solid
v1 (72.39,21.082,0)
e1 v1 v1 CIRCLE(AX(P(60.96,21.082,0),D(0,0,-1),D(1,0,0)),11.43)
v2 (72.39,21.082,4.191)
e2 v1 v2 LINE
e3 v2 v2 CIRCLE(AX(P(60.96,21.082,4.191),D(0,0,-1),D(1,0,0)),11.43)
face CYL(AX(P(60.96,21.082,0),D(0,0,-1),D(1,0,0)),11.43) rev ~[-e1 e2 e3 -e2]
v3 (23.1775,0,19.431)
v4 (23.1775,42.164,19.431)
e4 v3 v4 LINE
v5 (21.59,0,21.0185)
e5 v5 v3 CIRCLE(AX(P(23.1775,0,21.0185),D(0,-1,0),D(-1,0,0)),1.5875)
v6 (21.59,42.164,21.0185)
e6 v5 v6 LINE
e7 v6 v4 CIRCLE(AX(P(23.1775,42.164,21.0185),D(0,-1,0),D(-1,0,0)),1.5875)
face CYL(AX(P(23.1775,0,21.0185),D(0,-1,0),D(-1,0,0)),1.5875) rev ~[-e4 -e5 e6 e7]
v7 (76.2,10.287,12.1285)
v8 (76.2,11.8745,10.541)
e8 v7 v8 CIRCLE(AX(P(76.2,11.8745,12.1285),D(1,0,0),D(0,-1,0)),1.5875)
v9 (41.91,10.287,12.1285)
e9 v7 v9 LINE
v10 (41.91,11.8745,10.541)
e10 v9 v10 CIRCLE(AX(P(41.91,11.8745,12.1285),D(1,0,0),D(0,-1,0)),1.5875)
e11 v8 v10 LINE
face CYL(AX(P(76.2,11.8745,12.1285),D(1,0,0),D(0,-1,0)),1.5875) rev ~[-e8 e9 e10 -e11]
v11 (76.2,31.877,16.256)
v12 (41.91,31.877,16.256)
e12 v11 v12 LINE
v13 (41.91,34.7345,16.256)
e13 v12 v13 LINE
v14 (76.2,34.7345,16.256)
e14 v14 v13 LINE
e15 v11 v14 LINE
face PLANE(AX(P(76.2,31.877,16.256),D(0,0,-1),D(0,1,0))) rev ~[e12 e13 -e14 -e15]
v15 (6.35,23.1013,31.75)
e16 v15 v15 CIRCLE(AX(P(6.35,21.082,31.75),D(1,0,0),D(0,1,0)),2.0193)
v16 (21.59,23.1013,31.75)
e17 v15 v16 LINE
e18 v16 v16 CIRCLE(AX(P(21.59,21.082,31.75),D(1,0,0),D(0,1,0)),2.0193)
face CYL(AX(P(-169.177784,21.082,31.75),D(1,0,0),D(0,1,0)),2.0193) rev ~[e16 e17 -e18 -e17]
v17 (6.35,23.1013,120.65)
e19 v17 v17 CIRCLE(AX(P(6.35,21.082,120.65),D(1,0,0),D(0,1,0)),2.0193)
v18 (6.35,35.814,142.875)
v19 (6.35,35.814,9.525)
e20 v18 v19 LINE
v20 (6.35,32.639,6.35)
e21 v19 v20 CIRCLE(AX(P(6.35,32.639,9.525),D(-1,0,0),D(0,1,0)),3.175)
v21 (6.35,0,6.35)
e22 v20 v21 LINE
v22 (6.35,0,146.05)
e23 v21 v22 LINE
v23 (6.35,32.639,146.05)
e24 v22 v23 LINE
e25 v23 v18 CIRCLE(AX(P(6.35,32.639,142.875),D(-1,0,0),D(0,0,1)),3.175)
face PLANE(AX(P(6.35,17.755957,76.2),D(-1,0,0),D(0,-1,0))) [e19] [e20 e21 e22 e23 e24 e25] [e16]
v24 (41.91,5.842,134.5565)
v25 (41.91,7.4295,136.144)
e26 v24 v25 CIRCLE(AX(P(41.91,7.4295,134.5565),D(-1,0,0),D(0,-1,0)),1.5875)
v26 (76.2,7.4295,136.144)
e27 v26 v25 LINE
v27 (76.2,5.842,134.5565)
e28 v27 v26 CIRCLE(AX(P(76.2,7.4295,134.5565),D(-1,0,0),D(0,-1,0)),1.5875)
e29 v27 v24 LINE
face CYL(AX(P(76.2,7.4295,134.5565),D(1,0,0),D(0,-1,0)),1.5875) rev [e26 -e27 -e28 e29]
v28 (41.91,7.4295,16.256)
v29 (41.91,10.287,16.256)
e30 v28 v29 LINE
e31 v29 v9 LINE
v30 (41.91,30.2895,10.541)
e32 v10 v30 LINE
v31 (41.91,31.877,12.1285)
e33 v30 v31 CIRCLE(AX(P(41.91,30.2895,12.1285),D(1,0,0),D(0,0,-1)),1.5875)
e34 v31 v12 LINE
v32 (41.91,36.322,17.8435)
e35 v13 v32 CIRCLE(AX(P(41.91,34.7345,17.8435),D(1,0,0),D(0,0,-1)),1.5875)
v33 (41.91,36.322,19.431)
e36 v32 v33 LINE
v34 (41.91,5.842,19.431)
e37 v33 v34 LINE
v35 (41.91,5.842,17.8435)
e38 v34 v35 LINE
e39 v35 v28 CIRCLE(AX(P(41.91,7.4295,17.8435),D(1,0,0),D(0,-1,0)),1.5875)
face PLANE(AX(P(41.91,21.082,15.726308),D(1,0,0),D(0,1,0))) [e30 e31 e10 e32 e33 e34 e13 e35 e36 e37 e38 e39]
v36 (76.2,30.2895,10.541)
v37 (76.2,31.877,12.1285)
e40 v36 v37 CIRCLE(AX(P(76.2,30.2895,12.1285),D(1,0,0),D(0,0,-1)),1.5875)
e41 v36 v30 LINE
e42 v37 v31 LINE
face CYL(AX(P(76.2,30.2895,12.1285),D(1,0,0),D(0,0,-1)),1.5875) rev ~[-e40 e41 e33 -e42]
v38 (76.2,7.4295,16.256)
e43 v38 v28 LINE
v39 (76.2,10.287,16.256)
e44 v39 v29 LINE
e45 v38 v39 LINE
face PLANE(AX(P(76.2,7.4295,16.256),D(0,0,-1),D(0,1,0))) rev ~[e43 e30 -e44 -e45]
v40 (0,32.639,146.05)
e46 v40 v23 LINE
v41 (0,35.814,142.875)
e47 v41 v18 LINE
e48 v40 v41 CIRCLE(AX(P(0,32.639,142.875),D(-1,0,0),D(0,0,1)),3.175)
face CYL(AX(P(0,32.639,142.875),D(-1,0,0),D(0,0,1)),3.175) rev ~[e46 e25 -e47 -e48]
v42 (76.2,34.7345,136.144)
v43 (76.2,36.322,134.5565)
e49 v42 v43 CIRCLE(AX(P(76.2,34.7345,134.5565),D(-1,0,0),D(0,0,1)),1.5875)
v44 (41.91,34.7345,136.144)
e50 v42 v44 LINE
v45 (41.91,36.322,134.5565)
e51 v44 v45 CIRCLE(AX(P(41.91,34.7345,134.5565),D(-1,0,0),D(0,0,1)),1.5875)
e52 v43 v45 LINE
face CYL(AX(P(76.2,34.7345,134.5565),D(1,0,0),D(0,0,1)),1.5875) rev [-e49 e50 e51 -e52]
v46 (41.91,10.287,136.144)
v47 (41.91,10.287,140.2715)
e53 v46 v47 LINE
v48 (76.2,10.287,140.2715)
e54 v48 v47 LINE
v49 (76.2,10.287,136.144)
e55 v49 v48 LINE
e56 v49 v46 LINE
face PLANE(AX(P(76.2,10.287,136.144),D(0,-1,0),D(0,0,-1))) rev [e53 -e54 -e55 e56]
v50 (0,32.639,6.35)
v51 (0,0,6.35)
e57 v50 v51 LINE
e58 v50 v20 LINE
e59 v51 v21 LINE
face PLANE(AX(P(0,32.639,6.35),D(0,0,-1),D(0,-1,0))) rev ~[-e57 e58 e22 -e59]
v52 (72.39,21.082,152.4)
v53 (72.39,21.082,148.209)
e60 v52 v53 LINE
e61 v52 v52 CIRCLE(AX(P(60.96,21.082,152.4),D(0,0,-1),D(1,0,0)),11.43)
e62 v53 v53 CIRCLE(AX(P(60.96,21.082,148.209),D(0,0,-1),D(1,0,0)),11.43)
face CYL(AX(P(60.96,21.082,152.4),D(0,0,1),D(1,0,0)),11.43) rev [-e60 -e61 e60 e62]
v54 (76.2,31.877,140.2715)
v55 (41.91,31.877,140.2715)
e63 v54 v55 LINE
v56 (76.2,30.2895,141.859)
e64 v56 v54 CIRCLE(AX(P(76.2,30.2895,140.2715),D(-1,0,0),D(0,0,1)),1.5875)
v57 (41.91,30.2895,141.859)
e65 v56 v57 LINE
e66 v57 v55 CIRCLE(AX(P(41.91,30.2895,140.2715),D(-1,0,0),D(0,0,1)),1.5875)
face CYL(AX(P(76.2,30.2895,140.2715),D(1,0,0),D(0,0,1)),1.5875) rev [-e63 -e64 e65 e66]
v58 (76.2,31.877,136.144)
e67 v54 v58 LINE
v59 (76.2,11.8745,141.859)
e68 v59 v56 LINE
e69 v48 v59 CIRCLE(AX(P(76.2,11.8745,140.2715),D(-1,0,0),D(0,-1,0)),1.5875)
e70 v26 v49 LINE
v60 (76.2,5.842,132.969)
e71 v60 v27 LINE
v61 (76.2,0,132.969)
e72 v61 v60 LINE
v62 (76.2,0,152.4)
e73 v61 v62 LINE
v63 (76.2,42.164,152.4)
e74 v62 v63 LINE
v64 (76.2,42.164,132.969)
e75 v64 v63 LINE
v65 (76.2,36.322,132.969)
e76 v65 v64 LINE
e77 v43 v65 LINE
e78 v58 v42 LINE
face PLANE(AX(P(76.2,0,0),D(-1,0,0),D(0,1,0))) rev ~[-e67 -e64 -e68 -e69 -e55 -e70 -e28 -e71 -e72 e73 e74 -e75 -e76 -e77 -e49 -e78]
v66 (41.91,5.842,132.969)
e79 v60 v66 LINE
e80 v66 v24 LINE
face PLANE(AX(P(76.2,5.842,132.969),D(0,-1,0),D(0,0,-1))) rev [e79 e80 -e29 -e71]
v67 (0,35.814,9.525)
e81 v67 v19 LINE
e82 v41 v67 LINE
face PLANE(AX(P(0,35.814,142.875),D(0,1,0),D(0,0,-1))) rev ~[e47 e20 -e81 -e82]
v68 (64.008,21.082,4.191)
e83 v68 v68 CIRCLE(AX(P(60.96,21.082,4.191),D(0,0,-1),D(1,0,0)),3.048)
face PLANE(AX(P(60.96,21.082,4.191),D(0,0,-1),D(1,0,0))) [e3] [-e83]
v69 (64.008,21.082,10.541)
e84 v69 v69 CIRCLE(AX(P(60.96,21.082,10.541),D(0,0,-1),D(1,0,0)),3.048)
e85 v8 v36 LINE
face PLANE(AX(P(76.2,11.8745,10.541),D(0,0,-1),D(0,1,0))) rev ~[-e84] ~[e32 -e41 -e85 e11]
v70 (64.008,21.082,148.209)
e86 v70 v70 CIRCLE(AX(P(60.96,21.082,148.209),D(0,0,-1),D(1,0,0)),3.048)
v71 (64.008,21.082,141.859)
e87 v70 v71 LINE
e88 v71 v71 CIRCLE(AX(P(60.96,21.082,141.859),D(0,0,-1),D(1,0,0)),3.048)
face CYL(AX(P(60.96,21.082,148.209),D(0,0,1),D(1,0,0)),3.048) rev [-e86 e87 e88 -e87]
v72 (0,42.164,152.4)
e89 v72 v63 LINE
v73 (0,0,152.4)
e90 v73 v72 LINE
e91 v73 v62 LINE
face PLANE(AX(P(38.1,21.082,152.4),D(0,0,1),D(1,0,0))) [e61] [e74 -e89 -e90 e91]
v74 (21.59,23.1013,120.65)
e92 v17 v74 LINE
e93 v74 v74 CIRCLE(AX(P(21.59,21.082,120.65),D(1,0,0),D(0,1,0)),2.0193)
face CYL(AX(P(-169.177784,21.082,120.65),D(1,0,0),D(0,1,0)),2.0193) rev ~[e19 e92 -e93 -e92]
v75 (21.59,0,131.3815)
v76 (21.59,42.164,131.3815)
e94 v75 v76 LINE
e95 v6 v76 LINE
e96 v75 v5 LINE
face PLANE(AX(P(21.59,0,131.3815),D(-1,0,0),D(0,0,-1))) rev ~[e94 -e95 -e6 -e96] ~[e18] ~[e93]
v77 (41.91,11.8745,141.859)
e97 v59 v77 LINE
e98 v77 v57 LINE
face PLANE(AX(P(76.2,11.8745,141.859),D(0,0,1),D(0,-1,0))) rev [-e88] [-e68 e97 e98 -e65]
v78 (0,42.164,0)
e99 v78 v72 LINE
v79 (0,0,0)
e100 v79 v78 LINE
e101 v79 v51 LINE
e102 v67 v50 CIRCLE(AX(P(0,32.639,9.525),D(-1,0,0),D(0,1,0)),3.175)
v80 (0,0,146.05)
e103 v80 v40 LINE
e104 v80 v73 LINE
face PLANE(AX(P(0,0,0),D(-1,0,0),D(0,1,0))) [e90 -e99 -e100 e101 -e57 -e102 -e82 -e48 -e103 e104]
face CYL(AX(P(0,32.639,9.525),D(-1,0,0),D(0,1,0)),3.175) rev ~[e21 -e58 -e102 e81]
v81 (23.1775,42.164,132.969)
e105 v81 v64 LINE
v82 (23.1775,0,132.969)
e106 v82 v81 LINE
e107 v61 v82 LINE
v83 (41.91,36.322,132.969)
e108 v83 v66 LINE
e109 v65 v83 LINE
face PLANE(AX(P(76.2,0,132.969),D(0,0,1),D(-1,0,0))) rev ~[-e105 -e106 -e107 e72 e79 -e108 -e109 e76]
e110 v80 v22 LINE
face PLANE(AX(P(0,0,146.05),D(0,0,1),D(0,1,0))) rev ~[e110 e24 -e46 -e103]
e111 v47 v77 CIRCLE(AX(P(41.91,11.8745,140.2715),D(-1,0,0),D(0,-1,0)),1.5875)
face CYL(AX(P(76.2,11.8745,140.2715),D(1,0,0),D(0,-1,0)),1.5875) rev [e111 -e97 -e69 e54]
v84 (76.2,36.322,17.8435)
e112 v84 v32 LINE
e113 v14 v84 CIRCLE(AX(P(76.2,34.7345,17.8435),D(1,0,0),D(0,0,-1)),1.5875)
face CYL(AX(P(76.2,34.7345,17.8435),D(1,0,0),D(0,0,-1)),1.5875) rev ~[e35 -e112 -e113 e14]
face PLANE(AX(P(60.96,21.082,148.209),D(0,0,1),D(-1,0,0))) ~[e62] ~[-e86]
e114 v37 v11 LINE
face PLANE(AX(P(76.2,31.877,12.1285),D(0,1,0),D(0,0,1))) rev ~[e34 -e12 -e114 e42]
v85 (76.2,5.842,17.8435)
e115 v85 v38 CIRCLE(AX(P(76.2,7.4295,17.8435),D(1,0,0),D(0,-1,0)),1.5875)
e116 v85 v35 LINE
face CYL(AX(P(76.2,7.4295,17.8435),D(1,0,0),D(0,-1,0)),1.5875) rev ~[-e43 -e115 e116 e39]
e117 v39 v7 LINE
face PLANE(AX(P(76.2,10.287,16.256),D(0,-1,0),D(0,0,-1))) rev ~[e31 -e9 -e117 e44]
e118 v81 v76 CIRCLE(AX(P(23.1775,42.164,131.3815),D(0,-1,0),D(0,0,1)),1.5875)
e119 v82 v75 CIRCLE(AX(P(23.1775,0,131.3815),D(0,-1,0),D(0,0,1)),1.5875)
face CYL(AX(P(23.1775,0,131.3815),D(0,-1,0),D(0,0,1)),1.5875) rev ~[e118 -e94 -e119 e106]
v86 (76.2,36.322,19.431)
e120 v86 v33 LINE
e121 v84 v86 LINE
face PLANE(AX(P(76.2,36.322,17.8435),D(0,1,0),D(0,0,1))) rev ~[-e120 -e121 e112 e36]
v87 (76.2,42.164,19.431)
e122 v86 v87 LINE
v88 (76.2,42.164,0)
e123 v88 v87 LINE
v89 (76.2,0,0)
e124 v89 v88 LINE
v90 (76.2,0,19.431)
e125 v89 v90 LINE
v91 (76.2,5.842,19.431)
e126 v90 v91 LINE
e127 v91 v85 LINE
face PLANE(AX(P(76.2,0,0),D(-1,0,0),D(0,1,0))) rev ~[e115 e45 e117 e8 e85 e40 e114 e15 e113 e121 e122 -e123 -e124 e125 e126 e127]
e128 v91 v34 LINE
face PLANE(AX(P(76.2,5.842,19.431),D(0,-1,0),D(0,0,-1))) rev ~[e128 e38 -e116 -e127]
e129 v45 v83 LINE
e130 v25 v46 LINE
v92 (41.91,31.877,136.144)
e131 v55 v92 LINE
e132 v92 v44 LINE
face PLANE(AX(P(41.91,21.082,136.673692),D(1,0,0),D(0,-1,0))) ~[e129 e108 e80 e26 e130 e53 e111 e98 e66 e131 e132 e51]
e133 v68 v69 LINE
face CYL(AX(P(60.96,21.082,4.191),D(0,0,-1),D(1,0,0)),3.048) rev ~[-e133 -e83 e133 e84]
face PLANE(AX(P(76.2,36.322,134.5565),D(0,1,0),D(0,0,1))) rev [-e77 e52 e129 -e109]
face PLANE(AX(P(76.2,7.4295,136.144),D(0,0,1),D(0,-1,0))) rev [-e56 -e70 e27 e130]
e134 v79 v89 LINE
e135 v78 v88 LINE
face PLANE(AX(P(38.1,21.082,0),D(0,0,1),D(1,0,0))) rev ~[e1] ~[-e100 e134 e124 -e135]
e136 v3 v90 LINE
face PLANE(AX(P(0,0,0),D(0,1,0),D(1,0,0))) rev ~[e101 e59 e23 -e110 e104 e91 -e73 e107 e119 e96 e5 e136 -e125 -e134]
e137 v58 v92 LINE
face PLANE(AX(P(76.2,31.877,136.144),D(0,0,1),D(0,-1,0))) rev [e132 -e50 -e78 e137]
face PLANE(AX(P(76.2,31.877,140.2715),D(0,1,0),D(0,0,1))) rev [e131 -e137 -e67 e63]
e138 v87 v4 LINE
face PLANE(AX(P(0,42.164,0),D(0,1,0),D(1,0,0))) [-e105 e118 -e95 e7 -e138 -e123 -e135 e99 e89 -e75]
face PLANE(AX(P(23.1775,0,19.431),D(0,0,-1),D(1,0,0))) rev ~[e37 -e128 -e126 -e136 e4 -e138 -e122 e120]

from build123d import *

# Parameters (mm, degrees)
F0_W      = 76.2
F0_H      = 42.164
F1_DEPTH  = 152.4
F3_DEPTH  = 42.165
F5_DEPTH  = 34.29
F7_R      = 11.43
F8_DEPTH  = 4.191
F9_R      = 3.048
F10_DEPTH = 6.35
F12_DEPTH = 6.35
F14_D     = 4.0386


# Not quite as in the source:
# - a pattern or mirror of a feature is missing from the dataset's text; its kind, count and spacing are read off the source's solid


with BuildPart() as f1:
    # F0 (on Top) → F1 (new body)
    with BuildSketch(Plane.XY):
        with Locations((38.1, 21.082)):
            Rectangle(F0_W, F0_H)
    extrude(amount=F1_DEPTH)

    # F2 (on face) → F3 (cut, through all)
    with BuildSketch(Plane.XZ):
        with BuildLine():
            Line((23.1775, 19.431), (76.2, 19.431))
            Line((76.2, 19.431), (76.2, 132.969))
            Line((76.2, 132.969), (23.1775, 132.969))
            ThreePointArc((23.1775, 132.969), (22.0549679849, 132.5040320151), (21.59, 131.3815))
            Line((21.59, 131.3815), (21.59, 21.0185))
            ThreePointArc((21.59, 21.0185), (22.0549679849, 19.8959679849), (23.1775, 19.431))
        make_face()
    extrude(amount=-F3_DEPTH, mode=Mode.SUBTRACT)

    # F4 (on face) → F5 (cut)
    with BuildSketch(Plane.YZ.offset(76.2)):
        with BuildLine():
            Line((36.322, 17.8435), (36.322, 19.431))
            Line((36.322, 19.431), (5.842, 19.431))
            Line((5.842, 19.431), (5.842, 17.8435))
            ThreePointArc((5.842, 17.8435), (6.3069679849, 16.7209679849), (7.4295, 16.256))
            Line((7.4295, 16.256), (10.287, 16.256))
            Line((10.287, 16.256), (10.287, 12.1285))
            ThreePointArc((10.287, 12.1285), (10.7519679849, 11.0059679849), (11.8745, 10.541))
            Line((11.8745, 10.541), (30.2895, 10.541))
            ThreePointArc((30.2895, 10.541), (31.4120320151, 11.0059679849), (31.877, 12.1285))
            Line((31.877, 12.1285), (31.877, 16.256))
            Line((31.877, 16.256), (34.7345, 16.256))
            ThreePointArc((34.7345, 16.256), (35.8570320151, 16.7209679849), (36.322, 17.8435))
        make_face()
    f5 = extrude(amount=-F5_DEPTH, mode=Mode.SUBTRACT)

    # F5_copies: F5 across plane
    add(f5.mirror(Plane.XY.offset(76.2)), mode=Mode.SUBTRACT)

    # F7 (on face) → F8 (cut)
    with BuildSketch(Plane(origin=(0, 0, 0), x_dir=(1, 0, 0), z_dir=(0, 0, -1))):
        with Locations((60.96, -21.082)):
            Circle(F7_R)
    f8 = extrude(amount=-F8_DEPTH, mode=Mode.SUBTRACT)

    # F8_copies: F8 across plane
    add(f8.mirror(Plane.XY.offset(76.2)), mode=Mode.SUBTRACT)

    # F9 (on face) → F10 (cut, through all)
    with BuildSketch(Plane(origin=(0, 0, 4.191), x_dir=(1, 0, 0), z_dir=(0, 0, -1))):
        with Locations((60.96, -21.082)):
            Circle(F9_R)
    f10 = extrude(amount=-F10_DEPTH, mode=Mode.SUBTRACT)

    # F10_copies: F10 across plane
    add(f10.mirror(Plane.XY.offset(76.2)), mode=Mode.SUBTRACT)

    # F11 (on face) → F12 (cut)
    with BuildSketch(Plane(origin=(0, 0, 0), x_dir=(0, -1, 0), z_dir=(-1, 0, 0))):
        with BuildLine():
            Line((-32.639, 6.35), (0, 6.35))
            Line((0, 6.35), (0, 146.05))
            Line((0, 146.05), (-32.639, 146.05))
            ThreePointArc((-32.639, 146.05), (-34.8840640303, 145.1200640303), (-35.814, 142.875))
            Line((-35.814, 142.875), (-35.814, 9.525))
            ThreePointArc((-35.814, 9.525), (-34.8840640303, 7.2799359697), (-32.639, 6.35))
        make_face()
    extrude(amount=-F12_DEPTH, mode=Mode.SUBTRACT)

    # F14 (through all)
    with Locations(Plane(origin=(6.35, 0, 0), x_dir=(0, -1, 0), z_dir=(-1, 0, 0))):
        with Locations((-21.082, 120.65), (-21.082, 31.75)):
            Hole(F14_D / 2)


solid = f1.part
